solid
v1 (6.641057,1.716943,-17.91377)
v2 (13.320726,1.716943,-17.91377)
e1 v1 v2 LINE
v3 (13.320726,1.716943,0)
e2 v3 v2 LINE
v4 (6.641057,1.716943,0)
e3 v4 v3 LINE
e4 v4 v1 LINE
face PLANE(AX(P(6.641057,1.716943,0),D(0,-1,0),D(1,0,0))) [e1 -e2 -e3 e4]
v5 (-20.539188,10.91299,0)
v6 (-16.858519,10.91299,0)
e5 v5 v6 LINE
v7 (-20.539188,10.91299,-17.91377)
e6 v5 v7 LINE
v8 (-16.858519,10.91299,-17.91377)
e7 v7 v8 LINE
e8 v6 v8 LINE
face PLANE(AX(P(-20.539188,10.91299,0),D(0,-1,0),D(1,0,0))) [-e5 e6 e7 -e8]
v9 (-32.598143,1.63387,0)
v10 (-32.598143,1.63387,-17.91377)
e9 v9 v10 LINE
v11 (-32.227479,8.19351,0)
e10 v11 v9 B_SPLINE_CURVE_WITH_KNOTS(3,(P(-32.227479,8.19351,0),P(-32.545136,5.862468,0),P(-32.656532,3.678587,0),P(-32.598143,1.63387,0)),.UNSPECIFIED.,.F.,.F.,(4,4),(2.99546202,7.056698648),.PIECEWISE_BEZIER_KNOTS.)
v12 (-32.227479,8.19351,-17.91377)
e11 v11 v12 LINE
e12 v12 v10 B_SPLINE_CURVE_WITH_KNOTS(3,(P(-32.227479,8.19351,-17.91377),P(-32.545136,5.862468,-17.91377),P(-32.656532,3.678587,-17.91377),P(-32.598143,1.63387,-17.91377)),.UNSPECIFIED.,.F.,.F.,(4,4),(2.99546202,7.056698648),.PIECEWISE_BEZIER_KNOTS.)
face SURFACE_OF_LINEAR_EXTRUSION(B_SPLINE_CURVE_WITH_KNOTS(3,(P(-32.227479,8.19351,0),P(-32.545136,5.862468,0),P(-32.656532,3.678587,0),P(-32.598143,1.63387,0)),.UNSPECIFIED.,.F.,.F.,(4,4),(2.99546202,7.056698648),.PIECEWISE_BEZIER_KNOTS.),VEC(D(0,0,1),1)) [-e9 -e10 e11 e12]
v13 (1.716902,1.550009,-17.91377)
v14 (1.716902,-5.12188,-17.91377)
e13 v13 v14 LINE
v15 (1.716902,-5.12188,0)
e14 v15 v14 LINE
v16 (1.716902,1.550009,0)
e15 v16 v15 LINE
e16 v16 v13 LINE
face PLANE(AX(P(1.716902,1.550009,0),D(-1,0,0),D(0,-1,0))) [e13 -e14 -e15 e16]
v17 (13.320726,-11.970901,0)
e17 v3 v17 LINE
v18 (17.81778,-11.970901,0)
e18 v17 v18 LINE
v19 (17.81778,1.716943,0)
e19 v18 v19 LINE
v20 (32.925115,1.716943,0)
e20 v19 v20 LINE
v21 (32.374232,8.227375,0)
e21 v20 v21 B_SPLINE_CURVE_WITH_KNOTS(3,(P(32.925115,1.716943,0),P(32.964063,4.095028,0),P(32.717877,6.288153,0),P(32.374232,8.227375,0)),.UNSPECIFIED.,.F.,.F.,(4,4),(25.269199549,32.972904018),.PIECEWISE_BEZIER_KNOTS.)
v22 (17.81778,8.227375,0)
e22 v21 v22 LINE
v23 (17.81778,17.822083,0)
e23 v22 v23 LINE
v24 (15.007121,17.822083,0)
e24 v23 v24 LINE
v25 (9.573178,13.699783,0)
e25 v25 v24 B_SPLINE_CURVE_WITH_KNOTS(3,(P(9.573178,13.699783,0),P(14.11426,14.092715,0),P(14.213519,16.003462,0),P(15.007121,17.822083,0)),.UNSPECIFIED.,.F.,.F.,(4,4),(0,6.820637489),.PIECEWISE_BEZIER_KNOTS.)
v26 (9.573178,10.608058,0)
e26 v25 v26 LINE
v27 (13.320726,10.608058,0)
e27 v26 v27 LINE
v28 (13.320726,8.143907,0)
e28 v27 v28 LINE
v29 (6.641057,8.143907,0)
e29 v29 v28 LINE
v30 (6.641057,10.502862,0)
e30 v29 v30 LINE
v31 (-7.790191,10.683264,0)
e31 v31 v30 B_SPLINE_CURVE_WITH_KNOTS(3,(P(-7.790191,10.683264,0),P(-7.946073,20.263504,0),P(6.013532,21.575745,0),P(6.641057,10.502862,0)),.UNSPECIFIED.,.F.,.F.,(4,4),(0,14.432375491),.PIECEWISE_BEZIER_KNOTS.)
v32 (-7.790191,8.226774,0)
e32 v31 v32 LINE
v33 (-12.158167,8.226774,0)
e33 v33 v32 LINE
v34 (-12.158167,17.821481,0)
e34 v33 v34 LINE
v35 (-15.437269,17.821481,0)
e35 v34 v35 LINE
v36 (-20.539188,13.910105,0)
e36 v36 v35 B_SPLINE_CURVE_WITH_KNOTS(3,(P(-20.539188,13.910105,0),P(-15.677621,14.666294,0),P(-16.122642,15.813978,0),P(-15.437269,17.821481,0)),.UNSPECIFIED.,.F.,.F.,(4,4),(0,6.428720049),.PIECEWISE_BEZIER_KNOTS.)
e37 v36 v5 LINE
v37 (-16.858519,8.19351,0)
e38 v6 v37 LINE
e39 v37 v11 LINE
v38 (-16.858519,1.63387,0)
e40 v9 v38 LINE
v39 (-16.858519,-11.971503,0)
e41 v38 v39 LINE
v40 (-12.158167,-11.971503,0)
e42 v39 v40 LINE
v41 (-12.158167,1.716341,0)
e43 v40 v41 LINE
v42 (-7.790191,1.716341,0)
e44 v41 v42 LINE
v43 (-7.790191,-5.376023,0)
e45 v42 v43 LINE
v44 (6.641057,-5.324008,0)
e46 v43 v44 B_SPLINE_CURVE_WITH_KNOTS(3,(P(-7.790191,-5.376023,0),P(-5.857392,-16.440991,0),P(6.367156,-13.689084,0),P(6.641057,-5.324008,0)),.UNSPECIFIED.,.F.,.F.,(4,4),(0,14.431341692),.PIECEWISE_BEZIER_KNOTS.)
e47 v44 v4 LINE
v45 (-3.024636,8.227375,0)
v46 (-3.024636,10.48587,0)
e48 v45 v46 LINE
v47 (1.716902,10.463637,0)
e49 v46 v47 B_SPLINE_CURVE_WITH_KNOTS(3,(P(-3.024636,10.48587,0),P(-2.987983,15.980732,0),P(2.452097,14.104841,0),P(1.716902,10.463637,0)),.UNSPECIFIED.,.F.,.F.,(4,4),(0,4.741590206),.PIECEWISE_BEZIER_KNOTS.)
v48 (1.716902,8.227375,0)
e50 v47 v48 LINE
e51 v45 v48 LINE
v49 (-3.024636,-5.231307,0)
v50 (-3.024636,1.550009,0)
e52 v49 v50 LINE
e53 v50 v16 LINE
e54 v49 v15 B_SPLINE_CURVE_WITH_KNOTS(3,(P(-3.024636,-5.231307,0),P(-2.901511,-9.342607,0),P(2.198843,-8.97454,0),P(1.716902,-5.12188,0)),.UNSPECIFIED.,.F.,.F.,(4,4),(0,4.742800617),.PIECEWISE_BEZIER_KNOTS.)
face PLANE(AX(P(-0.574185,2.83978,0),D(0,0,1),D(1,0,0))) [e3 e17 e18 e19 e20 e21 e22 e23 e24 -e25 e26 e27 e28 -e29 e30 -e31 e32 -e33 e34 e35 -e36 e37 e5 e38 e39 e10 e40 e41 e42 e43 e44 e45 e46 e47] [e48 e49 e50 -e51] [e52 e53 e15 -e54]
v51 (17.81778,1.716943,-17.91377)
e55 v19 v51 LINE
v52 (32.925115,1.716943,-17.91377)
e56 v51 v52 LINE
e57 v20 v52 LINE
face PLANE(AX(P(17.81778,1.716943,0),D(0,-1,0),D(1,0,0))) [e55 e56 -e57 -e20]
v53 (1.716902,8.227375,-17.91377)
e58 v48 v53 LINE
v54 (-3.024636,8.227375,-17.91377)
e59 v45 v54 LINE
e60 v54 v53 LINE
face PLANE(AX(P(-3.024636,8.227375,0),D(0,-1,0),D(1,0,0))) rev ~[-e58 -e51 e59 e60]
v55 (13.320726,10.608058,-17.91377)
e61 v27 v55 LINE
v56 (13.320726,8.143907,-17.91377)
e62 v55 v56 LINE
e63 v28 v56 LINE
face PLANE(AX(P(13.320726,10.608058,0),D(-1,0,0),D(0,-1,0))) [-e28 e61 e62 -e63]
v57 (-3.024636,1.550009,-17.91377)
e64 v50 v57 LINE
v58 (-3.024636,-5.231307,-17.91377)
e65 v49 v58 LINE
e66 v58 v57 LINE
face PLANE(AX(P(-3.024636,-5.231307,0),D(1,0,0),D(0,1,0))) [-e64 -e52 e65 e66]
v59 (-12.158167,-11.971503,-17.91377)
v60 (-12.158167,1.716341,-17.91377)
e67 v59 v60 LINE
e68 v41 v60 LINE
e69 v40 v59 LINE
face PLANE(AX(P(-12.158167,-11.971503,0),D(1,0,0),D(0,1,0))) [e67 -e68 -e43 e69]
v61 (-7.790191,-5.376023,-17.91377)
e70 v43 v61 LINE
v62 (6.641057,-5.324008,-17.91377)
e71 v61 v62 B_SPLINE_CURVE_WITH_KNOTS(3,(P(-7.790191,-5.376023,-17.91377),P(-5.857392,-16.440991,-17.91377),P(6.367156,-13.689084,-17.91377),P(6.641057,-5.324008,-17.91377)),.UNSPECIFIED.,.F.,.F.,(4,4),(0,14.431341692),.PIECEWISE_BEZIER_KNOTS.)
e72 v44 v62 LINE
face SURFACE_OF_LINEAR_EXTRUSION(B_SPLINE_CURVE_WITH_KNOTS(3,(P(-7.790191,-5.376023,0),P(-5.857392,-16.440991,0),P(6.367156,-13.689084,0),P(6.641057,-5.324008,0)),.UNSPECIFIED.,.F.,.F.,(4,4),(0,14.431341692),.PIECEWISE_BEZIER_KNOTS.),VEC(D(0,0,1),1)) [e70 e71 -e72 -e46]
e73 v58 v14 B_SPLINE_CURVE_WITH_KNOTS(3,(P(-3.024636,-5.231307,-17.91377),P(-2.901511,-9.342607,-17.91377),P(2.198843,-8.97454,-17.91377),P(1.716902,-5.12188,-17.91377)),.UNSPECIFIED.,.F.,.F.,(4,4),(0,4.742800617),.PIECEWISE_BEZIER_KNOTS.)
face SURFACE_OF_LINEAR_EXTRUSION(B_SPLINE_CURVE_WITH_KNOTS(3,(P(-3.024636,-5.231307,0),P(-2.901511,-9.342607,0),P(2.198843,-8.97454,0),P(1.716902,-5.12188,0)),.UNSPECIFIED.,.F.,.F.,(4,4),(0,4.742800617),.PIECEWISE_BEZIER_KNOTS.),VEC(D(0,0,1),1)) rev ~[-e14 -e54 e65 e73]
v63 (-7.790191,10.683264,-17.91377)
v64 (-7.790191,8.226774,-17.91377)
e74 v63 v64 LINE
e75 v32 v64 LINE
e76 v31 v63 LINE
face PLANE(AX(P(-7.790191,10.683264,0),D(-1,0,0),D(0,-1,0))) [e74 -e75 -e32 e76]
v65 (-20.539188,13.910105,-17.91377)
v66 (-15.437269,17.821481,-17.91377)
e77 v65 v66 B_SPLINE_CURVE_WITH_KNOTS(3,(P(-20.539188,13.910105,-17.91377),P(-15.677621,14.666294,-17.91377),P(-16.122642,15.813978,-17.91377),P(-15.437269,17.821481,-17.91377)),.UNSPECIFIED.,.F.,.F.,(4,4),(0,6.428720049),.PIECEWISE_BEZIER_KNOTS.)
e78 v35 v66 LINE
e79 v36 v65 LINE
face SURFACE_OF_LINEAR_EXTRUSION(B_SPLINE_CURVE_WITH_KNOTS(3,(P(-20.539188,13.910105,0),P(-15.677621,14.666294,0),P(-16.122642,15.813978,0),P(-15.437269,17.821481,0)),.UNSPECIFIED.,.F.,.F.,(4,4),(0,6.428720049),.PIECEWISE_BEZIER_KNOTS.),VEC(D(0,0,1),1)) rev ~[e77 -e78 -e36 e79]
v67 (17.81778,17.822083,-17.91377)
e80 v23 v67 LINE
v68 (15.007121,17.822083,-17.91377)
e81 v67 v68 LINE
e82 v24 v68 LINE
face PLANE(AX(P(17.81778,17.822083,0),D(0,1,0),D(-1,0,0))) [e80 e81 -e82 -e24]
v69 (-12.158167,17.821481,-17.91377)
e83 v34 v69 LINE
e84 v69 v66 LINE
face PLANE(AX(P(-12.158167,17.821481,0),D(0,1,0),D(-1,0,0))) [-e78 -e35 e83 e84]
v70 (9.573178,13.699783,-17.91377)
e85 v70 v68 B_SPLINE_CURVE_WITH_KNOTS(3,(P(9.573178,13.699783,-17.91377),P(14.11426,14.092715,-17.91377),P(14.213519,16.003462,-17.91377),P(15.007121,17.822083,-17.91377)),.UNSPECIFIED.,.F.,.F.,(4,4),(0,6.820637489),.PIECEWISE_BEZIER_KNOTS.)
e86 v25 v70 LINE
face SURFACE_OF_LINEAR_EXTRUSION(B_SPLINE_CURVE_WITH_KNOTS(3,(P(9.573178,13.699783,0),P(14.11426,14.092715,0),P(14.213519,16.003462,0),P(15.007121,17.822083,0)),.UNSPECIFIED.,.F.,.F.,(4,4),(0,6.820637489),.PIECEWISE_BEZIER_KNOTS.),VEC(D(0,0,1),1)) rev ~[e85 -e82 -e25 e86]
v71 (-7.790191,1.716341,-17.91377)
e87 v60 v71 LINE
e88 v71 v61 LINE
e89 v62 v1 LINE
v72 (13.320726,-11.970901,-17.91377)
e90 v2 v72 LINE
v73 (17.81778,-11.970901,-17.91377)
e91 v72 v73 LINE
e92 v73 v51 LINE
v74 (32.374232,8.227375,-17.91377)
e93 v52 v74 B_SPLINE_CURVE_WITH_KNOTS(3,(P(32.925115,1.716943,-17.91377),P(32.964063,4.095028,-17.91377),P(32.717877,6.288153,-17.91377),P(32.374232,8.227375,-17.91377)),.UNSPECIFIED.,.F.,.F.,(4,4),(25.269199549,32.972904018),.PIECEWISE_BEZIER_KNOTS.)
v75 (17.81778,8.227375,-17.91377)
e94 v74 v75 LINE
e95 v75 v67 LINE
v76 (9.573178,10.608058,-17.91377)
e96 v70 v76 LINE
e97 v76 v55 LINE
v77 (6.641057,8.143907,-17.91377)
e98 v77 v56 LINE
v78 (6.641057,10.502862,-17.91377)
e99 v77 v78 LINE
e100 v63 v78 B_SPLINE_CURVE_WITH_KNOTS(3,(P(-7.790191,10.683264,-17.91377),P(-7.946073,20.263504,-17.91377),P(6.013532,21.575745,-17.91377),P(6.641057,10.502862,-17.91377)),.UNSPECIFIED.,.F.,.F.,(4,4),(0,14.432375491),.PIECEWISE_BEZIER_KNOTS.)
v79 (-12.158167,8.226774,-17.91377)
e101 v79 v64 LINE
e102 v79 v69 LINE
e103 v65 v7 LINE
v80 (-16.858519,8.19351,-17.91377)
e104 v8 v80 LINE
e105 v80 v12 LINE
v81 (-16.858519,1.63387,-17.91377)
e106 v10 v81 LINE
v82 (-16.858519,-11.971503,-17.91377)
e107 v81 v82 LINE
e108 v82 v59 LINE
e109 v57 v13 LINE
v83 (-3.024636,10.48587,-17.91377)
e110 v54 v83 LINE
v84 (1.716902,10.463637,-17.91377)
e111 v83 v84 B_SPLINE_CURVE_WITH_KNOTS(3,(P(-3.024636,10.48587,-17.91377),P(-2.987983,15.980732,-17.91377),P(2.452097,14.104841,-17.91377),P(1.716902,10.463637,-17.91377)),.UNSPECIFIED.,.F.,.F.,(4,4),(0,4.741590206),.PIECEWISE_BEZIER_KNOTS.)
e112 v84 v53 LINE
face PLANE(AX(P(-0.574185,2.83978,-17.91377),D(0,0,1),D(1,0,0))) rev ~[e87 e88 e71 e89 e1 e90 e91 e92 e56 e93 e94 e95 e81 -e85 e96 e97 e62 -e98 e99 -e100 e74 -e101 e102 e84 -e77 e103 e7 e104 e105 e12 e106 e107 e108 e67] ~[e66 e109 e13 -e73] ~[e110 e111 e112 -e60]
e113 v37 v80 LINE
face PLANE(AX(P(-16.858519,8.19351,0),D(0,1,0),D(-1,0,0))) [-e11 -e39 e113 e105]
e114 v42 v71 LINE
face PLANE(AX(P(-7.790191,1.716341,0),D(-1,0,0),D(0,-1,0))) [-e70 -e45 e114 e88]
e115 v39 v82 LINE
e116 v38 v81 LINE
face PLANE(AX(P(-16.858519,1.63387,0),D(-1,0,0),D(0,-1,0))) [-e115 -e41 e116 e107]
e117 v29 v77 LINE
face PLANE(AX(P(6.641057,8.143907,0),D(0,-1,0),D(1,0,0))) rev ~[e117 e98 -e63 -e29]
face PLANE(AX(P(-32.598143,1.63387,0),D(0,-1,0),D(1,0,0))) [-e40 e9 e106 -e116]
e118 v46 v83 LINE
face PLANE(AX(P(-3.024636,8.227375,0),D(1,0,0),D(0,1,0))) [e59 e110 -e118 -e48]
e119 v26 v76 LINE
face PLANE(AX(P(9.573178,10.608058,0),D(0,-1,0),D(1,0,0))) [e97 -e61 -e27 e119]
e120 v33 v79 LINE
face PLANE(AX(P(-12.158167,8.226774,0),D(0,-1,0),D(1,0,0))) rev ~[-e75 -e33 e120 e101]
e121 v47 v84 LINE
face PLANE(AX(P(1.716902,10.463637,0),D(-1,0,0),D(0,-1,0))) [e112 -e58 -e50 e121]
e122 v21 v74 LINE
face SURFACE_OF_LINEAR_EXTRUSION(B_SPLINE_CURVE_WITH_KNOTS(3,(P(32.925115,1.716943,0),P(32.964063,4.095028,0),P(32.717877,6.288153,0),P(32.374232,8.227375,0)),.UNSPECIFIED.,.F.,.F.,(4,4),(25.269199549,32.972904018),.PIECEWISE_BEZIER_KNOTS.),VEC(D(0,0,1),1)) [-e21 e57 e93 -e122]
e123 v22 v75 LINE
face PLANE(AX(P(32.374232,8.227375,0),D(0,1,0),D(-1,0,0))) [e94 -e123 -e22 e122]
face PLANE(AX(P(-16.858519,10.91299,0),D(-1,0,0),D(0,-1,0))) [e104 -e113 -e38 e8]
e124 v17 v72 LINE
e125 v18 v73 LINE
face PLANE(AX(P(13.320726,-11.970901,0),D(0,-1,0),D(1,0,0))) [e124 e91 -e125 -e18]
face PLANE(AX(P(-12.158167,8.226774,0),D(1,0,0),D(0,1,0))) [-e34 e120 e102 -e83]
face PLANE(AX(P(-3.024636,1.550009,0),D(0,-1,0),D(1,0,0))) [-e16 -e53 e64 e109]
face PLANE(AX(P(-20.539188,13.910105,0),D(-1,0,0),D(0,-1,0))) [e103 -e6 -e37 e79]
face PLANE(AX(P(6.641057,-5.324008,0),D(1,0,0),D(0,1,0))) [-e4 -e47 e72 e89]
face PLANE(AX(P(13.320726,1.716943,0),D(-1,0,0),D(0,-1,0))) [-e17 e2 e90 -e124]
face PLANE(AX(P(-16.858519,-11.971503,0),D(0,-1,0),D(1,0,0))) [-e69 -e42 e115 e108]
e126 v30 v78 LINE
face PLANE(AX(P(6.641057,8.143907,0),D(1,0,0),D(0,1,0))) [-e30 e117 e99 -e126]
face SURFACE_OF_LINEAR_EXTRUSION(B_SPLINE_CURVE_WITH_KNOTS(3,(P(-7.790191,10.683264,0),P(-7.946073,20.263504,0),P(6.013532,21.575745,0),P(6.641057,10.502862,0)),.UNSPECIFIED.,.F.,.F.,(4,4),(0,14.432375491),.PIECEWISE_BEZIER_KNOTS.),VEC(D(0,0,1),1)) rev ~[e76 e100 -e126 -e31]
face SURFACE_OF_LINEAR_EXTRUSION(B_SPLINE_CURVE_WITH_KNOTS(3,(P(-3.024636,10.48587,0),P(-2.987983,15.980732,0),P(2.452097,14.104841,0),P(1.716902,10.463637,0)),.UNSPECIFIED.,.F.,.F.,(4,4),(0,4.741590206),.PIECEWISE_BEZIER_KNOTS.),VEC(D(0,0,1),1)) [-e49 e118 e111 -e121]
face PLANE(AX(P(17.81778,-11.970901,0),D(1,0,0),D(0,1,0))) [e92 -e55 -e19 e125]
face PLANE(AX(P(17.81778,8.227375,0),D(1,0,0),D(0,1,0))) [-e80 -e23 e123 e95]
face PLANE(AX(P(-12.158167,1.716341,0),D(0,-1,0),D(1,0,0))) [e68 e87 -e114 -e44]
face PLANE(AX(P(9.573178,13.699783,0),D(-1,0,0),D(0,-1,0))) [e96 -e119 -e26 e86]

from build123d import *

# Parameters (mm, degrees)
F0_W     = 6.6796690226
F0_H     = 6.4269647701
F0_W_2   = 4.7415380832
F0_H_2   = 6.6773667932
F0_W_3   = 4.3679763669
F0_H_3   = 6.5104326932
F3_DEPTH = 17.91377


# Not quite as in the source:
# - a feature of the source that left no trace in its solid (it failed there, or was rolled back) is left out


with BuildPart() as f3:
    # F0 (on Top) → F3 (new body)
    with BuildSketch(Plane.XY):
        with BuildLine():
            Line((-7.7901906334, 10.6832636405), (-7.7901906334, 8.2267736901))
            Line((-7.7901906334, 8.2267736901), (-7.7901906334, 1.7163409969))
            Line((-7.7901906334, 1.7163409969), (-7.7901906334, -5.3760232519))
            add(Edge.make_bspline(
                [(-7.7901906334, -5.3760232519), (-5.8573922142, -16.4409913238), (6.3671558164, -13.6890839785), (6.6410573199, -5.3240084089)],
                knots=[0, 0, 0, 0, 14.4313416921, 14.4313416921, 14.4313416921, 14.4313416921], degree=3))
            Line((6.6410573199, -5.3240084089), (6.6410573199, 1.7169426428))
            Line((6.6410573199, 1.7169426428), (6.6410573199, 8.1439074129))
            Line((6.6410573199, 8.1439074129), (6.6410573199, 10.5028618127))
            add(Edge.make_bspline(
                [(-7.7901906334, 10.6832636405), (-7.9460730776, 20.2635042254), (6.0135321692, 21.5757451952), (6.6410573199, 10.5028618127)],
                knots=[0, 0, 0, 0, 14.4323754909, 14.4323754909, 14.4323754909, 14.4323754909], degree=3))
        make_face()
        with BuildLine():
            Line((-3.0246356037, 8.227375336), (-3.0246356037, 10.4858698323))
            add(Edge.make_bspline(
                [(-3.0246356037, 10.4858698323), (-2.9879831709, 15.9807316959), (2.4520969018, 14.104841277), (1.7169024795, 10.4636372998)],
                knots=[0, 0, 0, 0, 4.7415902058, 4.7415902058, 4.7415902058, 4.7415902058], degree=3))
            Line((1.7169024795, 10.4636372998), (1.7169024795, 8.227375336))
            Line((1.7169024795, 8.227375336), (1.7169024795, 1.5500085428))
            Line((1.7169024795, 1.5500085428), (1.7169024795, -5.1218802109))
            add(Edge.make_bspline(
                [(-3.0246356037, -5.2313073538), (-2.9015108012, -9.3426071107), (2.1988428198, -8.9745400473), (1.7169024795, -5.1218802109)],
                knots=[0, 0, 0, 0, 4.7428006171, 4.7428006171, 4.7428006171, 4.7428006171], degree=3))
            Line((-3.0246356037, -5.2313073538), (-3.0246356037, 1.5500085428))
            Line((-3.0246356037, 1.5500085428), (-3.0246356037, 8.227375336))
        make_face(mode=Mode.SUBTRACT)
        with BuildLine():
            add(Edge.make_bspline(
                [(-20.5391882093, 13.9101054404), (-15.6776210399, 14.6662937362), (-16.1226423563, 15.8139783774), (-15.4372690351, 17.8214814399)],
                knots=[0, 0, 0, 0, 6.4287200491, 6.4287200491, 6.4287200491, 6.4287200491], degree=3))
            Line((-20.5391882093, 13.9101054404), (-20.5391882093, 10.912990186))
            Line((-20.5391882093, 10.912990186), (-16.858519438, 10.912990186))
            Line((-16.858519438, 10.912990186), (-16.858519438, 8.1935095558))
            Line((-16.858519438, 8.1935095558), (-16.858519438, 1.6338703002))
            Line((-16.858519438, 1.6338703002), (-16.858519438, -11.9715025764))
            Line((-16.858519438, -11.9715025764), (-12.1581670002, -11.9715025764))
            Line((-12.1581670002, -11.9715025764), (-12.1581670002, 1.7163409969))
            Line((-12.1581670002, 1.7163409969), (-12.1581670002, 8.2267736901))
            Line((-12.1581670002, 8.2267736901), (-12.1581670002, 17.8214814399))
            Line((-12.1581670002, 17.8214814399), (-15.4372690351, 17.8214814399))
        make_face()
        with BuildLine():
            Line((13.3207263425, 10.6080584228), (13.3207263425, 8.1439074129))
            Line((13.3207263425, 8.1439074129), (13.3207263425, 1.7169426428))
            Line((13.3207263425, 1.7169426428), (13.3207263425, -11.9709009305))
            Line((13.3207263425, -11.9709009305), (17.8177803755, -11.9709009305))
            Line((17.8177803755, -11.9709009305), (17.8177803755, 1.7169426428))
            Line((17.8177803755, 1.7169426428), (17.8177803755, 8.227375336))
            Line((17.8177803755, 8.227375336), (17.8177803755, 17.8220830858))
            Line((17.8177803755, 17.8220830858), (15.0071214885, 17.8220830858))
            add(Edge.make_bspline(
                [(9.5731783658, 13.6997830123), (14.1142597422, 14.0927145258), (14.2135191709, 16.0034615546), (15.0071214885, 17.8220830858)],
                knots=[0, 0, 0, 0, 6.820637489, 6.820637489, 6.820637489, 6.820637489], degree=3))
            Line((9.5731783658, 13.6997830123), (9.5731783658, 10.6080584228))
            Line((9.5731783658, 10.6080584228), (13.3207263425, 10.6080584228))
        make_face()
        with BuildLine():
            Line((-16.858519438, 1.6338703002), (-16.858519438, 8.1935095558))
            Line((-16.858519438, 8.1935095558), (-32.2274787855, 8.1935095558))
            add(Edge.make_bspline(
                [(-32.2274787855, 8.1935095558), (-32.5451358574, 5.8624682682), (-32.6565323778, 3.6785873351), (-32.5981434394, 1.6338703002)],
                knots=[2.9954620198, 2.9954620198, 2.9954620198, 2.9954620198, 7.0566986479, 7.0566986479, 7.0566986479, 7.0566986479], degree=3))
            Line((-32.5981434394, 1.6338703002), (-16.858519438, 1.6338703002))
        make_face()
        with BuildLine():
            Line((17.8177803755, 1.7169426428), (32.925114671, 1.7169426428))
            add(Edge.make_bspline(
                [(32.925114671, 1.7169426428), (32.9640628967, 4.0950280506), (32.7178774406, 6.2881527237), (32.3742319383, 8.227375336)],
                knots=[25.2691995487, 25.2691995487, 25.2691995487, 25.2691995487, 32.9729040179, 32.9729040179, 32.9729040179, 32.9729040179], degree=3))
            Line((32.3742319383, 8.227375336), (17.8177803755, 8.227375336))
            Line((17.8177803755, 8.227375336), (17.8177803755, 1.7169426428))
        make_face()
        with Locations((9.9808918312, 4.9304250279)):
            Rectangle(F0_W, F0_H)
        with Locations((-0.6538665621, 4.8886919394)):
            Rectangle(F0_W_2, F0_H_2)
        with Locations((-9.9741788168, 4.9715573435)):
            Rectangle(F0_W_3, F0_H_3)
    extrude(amount=-F3_DEPTH)


solid = f3.part
